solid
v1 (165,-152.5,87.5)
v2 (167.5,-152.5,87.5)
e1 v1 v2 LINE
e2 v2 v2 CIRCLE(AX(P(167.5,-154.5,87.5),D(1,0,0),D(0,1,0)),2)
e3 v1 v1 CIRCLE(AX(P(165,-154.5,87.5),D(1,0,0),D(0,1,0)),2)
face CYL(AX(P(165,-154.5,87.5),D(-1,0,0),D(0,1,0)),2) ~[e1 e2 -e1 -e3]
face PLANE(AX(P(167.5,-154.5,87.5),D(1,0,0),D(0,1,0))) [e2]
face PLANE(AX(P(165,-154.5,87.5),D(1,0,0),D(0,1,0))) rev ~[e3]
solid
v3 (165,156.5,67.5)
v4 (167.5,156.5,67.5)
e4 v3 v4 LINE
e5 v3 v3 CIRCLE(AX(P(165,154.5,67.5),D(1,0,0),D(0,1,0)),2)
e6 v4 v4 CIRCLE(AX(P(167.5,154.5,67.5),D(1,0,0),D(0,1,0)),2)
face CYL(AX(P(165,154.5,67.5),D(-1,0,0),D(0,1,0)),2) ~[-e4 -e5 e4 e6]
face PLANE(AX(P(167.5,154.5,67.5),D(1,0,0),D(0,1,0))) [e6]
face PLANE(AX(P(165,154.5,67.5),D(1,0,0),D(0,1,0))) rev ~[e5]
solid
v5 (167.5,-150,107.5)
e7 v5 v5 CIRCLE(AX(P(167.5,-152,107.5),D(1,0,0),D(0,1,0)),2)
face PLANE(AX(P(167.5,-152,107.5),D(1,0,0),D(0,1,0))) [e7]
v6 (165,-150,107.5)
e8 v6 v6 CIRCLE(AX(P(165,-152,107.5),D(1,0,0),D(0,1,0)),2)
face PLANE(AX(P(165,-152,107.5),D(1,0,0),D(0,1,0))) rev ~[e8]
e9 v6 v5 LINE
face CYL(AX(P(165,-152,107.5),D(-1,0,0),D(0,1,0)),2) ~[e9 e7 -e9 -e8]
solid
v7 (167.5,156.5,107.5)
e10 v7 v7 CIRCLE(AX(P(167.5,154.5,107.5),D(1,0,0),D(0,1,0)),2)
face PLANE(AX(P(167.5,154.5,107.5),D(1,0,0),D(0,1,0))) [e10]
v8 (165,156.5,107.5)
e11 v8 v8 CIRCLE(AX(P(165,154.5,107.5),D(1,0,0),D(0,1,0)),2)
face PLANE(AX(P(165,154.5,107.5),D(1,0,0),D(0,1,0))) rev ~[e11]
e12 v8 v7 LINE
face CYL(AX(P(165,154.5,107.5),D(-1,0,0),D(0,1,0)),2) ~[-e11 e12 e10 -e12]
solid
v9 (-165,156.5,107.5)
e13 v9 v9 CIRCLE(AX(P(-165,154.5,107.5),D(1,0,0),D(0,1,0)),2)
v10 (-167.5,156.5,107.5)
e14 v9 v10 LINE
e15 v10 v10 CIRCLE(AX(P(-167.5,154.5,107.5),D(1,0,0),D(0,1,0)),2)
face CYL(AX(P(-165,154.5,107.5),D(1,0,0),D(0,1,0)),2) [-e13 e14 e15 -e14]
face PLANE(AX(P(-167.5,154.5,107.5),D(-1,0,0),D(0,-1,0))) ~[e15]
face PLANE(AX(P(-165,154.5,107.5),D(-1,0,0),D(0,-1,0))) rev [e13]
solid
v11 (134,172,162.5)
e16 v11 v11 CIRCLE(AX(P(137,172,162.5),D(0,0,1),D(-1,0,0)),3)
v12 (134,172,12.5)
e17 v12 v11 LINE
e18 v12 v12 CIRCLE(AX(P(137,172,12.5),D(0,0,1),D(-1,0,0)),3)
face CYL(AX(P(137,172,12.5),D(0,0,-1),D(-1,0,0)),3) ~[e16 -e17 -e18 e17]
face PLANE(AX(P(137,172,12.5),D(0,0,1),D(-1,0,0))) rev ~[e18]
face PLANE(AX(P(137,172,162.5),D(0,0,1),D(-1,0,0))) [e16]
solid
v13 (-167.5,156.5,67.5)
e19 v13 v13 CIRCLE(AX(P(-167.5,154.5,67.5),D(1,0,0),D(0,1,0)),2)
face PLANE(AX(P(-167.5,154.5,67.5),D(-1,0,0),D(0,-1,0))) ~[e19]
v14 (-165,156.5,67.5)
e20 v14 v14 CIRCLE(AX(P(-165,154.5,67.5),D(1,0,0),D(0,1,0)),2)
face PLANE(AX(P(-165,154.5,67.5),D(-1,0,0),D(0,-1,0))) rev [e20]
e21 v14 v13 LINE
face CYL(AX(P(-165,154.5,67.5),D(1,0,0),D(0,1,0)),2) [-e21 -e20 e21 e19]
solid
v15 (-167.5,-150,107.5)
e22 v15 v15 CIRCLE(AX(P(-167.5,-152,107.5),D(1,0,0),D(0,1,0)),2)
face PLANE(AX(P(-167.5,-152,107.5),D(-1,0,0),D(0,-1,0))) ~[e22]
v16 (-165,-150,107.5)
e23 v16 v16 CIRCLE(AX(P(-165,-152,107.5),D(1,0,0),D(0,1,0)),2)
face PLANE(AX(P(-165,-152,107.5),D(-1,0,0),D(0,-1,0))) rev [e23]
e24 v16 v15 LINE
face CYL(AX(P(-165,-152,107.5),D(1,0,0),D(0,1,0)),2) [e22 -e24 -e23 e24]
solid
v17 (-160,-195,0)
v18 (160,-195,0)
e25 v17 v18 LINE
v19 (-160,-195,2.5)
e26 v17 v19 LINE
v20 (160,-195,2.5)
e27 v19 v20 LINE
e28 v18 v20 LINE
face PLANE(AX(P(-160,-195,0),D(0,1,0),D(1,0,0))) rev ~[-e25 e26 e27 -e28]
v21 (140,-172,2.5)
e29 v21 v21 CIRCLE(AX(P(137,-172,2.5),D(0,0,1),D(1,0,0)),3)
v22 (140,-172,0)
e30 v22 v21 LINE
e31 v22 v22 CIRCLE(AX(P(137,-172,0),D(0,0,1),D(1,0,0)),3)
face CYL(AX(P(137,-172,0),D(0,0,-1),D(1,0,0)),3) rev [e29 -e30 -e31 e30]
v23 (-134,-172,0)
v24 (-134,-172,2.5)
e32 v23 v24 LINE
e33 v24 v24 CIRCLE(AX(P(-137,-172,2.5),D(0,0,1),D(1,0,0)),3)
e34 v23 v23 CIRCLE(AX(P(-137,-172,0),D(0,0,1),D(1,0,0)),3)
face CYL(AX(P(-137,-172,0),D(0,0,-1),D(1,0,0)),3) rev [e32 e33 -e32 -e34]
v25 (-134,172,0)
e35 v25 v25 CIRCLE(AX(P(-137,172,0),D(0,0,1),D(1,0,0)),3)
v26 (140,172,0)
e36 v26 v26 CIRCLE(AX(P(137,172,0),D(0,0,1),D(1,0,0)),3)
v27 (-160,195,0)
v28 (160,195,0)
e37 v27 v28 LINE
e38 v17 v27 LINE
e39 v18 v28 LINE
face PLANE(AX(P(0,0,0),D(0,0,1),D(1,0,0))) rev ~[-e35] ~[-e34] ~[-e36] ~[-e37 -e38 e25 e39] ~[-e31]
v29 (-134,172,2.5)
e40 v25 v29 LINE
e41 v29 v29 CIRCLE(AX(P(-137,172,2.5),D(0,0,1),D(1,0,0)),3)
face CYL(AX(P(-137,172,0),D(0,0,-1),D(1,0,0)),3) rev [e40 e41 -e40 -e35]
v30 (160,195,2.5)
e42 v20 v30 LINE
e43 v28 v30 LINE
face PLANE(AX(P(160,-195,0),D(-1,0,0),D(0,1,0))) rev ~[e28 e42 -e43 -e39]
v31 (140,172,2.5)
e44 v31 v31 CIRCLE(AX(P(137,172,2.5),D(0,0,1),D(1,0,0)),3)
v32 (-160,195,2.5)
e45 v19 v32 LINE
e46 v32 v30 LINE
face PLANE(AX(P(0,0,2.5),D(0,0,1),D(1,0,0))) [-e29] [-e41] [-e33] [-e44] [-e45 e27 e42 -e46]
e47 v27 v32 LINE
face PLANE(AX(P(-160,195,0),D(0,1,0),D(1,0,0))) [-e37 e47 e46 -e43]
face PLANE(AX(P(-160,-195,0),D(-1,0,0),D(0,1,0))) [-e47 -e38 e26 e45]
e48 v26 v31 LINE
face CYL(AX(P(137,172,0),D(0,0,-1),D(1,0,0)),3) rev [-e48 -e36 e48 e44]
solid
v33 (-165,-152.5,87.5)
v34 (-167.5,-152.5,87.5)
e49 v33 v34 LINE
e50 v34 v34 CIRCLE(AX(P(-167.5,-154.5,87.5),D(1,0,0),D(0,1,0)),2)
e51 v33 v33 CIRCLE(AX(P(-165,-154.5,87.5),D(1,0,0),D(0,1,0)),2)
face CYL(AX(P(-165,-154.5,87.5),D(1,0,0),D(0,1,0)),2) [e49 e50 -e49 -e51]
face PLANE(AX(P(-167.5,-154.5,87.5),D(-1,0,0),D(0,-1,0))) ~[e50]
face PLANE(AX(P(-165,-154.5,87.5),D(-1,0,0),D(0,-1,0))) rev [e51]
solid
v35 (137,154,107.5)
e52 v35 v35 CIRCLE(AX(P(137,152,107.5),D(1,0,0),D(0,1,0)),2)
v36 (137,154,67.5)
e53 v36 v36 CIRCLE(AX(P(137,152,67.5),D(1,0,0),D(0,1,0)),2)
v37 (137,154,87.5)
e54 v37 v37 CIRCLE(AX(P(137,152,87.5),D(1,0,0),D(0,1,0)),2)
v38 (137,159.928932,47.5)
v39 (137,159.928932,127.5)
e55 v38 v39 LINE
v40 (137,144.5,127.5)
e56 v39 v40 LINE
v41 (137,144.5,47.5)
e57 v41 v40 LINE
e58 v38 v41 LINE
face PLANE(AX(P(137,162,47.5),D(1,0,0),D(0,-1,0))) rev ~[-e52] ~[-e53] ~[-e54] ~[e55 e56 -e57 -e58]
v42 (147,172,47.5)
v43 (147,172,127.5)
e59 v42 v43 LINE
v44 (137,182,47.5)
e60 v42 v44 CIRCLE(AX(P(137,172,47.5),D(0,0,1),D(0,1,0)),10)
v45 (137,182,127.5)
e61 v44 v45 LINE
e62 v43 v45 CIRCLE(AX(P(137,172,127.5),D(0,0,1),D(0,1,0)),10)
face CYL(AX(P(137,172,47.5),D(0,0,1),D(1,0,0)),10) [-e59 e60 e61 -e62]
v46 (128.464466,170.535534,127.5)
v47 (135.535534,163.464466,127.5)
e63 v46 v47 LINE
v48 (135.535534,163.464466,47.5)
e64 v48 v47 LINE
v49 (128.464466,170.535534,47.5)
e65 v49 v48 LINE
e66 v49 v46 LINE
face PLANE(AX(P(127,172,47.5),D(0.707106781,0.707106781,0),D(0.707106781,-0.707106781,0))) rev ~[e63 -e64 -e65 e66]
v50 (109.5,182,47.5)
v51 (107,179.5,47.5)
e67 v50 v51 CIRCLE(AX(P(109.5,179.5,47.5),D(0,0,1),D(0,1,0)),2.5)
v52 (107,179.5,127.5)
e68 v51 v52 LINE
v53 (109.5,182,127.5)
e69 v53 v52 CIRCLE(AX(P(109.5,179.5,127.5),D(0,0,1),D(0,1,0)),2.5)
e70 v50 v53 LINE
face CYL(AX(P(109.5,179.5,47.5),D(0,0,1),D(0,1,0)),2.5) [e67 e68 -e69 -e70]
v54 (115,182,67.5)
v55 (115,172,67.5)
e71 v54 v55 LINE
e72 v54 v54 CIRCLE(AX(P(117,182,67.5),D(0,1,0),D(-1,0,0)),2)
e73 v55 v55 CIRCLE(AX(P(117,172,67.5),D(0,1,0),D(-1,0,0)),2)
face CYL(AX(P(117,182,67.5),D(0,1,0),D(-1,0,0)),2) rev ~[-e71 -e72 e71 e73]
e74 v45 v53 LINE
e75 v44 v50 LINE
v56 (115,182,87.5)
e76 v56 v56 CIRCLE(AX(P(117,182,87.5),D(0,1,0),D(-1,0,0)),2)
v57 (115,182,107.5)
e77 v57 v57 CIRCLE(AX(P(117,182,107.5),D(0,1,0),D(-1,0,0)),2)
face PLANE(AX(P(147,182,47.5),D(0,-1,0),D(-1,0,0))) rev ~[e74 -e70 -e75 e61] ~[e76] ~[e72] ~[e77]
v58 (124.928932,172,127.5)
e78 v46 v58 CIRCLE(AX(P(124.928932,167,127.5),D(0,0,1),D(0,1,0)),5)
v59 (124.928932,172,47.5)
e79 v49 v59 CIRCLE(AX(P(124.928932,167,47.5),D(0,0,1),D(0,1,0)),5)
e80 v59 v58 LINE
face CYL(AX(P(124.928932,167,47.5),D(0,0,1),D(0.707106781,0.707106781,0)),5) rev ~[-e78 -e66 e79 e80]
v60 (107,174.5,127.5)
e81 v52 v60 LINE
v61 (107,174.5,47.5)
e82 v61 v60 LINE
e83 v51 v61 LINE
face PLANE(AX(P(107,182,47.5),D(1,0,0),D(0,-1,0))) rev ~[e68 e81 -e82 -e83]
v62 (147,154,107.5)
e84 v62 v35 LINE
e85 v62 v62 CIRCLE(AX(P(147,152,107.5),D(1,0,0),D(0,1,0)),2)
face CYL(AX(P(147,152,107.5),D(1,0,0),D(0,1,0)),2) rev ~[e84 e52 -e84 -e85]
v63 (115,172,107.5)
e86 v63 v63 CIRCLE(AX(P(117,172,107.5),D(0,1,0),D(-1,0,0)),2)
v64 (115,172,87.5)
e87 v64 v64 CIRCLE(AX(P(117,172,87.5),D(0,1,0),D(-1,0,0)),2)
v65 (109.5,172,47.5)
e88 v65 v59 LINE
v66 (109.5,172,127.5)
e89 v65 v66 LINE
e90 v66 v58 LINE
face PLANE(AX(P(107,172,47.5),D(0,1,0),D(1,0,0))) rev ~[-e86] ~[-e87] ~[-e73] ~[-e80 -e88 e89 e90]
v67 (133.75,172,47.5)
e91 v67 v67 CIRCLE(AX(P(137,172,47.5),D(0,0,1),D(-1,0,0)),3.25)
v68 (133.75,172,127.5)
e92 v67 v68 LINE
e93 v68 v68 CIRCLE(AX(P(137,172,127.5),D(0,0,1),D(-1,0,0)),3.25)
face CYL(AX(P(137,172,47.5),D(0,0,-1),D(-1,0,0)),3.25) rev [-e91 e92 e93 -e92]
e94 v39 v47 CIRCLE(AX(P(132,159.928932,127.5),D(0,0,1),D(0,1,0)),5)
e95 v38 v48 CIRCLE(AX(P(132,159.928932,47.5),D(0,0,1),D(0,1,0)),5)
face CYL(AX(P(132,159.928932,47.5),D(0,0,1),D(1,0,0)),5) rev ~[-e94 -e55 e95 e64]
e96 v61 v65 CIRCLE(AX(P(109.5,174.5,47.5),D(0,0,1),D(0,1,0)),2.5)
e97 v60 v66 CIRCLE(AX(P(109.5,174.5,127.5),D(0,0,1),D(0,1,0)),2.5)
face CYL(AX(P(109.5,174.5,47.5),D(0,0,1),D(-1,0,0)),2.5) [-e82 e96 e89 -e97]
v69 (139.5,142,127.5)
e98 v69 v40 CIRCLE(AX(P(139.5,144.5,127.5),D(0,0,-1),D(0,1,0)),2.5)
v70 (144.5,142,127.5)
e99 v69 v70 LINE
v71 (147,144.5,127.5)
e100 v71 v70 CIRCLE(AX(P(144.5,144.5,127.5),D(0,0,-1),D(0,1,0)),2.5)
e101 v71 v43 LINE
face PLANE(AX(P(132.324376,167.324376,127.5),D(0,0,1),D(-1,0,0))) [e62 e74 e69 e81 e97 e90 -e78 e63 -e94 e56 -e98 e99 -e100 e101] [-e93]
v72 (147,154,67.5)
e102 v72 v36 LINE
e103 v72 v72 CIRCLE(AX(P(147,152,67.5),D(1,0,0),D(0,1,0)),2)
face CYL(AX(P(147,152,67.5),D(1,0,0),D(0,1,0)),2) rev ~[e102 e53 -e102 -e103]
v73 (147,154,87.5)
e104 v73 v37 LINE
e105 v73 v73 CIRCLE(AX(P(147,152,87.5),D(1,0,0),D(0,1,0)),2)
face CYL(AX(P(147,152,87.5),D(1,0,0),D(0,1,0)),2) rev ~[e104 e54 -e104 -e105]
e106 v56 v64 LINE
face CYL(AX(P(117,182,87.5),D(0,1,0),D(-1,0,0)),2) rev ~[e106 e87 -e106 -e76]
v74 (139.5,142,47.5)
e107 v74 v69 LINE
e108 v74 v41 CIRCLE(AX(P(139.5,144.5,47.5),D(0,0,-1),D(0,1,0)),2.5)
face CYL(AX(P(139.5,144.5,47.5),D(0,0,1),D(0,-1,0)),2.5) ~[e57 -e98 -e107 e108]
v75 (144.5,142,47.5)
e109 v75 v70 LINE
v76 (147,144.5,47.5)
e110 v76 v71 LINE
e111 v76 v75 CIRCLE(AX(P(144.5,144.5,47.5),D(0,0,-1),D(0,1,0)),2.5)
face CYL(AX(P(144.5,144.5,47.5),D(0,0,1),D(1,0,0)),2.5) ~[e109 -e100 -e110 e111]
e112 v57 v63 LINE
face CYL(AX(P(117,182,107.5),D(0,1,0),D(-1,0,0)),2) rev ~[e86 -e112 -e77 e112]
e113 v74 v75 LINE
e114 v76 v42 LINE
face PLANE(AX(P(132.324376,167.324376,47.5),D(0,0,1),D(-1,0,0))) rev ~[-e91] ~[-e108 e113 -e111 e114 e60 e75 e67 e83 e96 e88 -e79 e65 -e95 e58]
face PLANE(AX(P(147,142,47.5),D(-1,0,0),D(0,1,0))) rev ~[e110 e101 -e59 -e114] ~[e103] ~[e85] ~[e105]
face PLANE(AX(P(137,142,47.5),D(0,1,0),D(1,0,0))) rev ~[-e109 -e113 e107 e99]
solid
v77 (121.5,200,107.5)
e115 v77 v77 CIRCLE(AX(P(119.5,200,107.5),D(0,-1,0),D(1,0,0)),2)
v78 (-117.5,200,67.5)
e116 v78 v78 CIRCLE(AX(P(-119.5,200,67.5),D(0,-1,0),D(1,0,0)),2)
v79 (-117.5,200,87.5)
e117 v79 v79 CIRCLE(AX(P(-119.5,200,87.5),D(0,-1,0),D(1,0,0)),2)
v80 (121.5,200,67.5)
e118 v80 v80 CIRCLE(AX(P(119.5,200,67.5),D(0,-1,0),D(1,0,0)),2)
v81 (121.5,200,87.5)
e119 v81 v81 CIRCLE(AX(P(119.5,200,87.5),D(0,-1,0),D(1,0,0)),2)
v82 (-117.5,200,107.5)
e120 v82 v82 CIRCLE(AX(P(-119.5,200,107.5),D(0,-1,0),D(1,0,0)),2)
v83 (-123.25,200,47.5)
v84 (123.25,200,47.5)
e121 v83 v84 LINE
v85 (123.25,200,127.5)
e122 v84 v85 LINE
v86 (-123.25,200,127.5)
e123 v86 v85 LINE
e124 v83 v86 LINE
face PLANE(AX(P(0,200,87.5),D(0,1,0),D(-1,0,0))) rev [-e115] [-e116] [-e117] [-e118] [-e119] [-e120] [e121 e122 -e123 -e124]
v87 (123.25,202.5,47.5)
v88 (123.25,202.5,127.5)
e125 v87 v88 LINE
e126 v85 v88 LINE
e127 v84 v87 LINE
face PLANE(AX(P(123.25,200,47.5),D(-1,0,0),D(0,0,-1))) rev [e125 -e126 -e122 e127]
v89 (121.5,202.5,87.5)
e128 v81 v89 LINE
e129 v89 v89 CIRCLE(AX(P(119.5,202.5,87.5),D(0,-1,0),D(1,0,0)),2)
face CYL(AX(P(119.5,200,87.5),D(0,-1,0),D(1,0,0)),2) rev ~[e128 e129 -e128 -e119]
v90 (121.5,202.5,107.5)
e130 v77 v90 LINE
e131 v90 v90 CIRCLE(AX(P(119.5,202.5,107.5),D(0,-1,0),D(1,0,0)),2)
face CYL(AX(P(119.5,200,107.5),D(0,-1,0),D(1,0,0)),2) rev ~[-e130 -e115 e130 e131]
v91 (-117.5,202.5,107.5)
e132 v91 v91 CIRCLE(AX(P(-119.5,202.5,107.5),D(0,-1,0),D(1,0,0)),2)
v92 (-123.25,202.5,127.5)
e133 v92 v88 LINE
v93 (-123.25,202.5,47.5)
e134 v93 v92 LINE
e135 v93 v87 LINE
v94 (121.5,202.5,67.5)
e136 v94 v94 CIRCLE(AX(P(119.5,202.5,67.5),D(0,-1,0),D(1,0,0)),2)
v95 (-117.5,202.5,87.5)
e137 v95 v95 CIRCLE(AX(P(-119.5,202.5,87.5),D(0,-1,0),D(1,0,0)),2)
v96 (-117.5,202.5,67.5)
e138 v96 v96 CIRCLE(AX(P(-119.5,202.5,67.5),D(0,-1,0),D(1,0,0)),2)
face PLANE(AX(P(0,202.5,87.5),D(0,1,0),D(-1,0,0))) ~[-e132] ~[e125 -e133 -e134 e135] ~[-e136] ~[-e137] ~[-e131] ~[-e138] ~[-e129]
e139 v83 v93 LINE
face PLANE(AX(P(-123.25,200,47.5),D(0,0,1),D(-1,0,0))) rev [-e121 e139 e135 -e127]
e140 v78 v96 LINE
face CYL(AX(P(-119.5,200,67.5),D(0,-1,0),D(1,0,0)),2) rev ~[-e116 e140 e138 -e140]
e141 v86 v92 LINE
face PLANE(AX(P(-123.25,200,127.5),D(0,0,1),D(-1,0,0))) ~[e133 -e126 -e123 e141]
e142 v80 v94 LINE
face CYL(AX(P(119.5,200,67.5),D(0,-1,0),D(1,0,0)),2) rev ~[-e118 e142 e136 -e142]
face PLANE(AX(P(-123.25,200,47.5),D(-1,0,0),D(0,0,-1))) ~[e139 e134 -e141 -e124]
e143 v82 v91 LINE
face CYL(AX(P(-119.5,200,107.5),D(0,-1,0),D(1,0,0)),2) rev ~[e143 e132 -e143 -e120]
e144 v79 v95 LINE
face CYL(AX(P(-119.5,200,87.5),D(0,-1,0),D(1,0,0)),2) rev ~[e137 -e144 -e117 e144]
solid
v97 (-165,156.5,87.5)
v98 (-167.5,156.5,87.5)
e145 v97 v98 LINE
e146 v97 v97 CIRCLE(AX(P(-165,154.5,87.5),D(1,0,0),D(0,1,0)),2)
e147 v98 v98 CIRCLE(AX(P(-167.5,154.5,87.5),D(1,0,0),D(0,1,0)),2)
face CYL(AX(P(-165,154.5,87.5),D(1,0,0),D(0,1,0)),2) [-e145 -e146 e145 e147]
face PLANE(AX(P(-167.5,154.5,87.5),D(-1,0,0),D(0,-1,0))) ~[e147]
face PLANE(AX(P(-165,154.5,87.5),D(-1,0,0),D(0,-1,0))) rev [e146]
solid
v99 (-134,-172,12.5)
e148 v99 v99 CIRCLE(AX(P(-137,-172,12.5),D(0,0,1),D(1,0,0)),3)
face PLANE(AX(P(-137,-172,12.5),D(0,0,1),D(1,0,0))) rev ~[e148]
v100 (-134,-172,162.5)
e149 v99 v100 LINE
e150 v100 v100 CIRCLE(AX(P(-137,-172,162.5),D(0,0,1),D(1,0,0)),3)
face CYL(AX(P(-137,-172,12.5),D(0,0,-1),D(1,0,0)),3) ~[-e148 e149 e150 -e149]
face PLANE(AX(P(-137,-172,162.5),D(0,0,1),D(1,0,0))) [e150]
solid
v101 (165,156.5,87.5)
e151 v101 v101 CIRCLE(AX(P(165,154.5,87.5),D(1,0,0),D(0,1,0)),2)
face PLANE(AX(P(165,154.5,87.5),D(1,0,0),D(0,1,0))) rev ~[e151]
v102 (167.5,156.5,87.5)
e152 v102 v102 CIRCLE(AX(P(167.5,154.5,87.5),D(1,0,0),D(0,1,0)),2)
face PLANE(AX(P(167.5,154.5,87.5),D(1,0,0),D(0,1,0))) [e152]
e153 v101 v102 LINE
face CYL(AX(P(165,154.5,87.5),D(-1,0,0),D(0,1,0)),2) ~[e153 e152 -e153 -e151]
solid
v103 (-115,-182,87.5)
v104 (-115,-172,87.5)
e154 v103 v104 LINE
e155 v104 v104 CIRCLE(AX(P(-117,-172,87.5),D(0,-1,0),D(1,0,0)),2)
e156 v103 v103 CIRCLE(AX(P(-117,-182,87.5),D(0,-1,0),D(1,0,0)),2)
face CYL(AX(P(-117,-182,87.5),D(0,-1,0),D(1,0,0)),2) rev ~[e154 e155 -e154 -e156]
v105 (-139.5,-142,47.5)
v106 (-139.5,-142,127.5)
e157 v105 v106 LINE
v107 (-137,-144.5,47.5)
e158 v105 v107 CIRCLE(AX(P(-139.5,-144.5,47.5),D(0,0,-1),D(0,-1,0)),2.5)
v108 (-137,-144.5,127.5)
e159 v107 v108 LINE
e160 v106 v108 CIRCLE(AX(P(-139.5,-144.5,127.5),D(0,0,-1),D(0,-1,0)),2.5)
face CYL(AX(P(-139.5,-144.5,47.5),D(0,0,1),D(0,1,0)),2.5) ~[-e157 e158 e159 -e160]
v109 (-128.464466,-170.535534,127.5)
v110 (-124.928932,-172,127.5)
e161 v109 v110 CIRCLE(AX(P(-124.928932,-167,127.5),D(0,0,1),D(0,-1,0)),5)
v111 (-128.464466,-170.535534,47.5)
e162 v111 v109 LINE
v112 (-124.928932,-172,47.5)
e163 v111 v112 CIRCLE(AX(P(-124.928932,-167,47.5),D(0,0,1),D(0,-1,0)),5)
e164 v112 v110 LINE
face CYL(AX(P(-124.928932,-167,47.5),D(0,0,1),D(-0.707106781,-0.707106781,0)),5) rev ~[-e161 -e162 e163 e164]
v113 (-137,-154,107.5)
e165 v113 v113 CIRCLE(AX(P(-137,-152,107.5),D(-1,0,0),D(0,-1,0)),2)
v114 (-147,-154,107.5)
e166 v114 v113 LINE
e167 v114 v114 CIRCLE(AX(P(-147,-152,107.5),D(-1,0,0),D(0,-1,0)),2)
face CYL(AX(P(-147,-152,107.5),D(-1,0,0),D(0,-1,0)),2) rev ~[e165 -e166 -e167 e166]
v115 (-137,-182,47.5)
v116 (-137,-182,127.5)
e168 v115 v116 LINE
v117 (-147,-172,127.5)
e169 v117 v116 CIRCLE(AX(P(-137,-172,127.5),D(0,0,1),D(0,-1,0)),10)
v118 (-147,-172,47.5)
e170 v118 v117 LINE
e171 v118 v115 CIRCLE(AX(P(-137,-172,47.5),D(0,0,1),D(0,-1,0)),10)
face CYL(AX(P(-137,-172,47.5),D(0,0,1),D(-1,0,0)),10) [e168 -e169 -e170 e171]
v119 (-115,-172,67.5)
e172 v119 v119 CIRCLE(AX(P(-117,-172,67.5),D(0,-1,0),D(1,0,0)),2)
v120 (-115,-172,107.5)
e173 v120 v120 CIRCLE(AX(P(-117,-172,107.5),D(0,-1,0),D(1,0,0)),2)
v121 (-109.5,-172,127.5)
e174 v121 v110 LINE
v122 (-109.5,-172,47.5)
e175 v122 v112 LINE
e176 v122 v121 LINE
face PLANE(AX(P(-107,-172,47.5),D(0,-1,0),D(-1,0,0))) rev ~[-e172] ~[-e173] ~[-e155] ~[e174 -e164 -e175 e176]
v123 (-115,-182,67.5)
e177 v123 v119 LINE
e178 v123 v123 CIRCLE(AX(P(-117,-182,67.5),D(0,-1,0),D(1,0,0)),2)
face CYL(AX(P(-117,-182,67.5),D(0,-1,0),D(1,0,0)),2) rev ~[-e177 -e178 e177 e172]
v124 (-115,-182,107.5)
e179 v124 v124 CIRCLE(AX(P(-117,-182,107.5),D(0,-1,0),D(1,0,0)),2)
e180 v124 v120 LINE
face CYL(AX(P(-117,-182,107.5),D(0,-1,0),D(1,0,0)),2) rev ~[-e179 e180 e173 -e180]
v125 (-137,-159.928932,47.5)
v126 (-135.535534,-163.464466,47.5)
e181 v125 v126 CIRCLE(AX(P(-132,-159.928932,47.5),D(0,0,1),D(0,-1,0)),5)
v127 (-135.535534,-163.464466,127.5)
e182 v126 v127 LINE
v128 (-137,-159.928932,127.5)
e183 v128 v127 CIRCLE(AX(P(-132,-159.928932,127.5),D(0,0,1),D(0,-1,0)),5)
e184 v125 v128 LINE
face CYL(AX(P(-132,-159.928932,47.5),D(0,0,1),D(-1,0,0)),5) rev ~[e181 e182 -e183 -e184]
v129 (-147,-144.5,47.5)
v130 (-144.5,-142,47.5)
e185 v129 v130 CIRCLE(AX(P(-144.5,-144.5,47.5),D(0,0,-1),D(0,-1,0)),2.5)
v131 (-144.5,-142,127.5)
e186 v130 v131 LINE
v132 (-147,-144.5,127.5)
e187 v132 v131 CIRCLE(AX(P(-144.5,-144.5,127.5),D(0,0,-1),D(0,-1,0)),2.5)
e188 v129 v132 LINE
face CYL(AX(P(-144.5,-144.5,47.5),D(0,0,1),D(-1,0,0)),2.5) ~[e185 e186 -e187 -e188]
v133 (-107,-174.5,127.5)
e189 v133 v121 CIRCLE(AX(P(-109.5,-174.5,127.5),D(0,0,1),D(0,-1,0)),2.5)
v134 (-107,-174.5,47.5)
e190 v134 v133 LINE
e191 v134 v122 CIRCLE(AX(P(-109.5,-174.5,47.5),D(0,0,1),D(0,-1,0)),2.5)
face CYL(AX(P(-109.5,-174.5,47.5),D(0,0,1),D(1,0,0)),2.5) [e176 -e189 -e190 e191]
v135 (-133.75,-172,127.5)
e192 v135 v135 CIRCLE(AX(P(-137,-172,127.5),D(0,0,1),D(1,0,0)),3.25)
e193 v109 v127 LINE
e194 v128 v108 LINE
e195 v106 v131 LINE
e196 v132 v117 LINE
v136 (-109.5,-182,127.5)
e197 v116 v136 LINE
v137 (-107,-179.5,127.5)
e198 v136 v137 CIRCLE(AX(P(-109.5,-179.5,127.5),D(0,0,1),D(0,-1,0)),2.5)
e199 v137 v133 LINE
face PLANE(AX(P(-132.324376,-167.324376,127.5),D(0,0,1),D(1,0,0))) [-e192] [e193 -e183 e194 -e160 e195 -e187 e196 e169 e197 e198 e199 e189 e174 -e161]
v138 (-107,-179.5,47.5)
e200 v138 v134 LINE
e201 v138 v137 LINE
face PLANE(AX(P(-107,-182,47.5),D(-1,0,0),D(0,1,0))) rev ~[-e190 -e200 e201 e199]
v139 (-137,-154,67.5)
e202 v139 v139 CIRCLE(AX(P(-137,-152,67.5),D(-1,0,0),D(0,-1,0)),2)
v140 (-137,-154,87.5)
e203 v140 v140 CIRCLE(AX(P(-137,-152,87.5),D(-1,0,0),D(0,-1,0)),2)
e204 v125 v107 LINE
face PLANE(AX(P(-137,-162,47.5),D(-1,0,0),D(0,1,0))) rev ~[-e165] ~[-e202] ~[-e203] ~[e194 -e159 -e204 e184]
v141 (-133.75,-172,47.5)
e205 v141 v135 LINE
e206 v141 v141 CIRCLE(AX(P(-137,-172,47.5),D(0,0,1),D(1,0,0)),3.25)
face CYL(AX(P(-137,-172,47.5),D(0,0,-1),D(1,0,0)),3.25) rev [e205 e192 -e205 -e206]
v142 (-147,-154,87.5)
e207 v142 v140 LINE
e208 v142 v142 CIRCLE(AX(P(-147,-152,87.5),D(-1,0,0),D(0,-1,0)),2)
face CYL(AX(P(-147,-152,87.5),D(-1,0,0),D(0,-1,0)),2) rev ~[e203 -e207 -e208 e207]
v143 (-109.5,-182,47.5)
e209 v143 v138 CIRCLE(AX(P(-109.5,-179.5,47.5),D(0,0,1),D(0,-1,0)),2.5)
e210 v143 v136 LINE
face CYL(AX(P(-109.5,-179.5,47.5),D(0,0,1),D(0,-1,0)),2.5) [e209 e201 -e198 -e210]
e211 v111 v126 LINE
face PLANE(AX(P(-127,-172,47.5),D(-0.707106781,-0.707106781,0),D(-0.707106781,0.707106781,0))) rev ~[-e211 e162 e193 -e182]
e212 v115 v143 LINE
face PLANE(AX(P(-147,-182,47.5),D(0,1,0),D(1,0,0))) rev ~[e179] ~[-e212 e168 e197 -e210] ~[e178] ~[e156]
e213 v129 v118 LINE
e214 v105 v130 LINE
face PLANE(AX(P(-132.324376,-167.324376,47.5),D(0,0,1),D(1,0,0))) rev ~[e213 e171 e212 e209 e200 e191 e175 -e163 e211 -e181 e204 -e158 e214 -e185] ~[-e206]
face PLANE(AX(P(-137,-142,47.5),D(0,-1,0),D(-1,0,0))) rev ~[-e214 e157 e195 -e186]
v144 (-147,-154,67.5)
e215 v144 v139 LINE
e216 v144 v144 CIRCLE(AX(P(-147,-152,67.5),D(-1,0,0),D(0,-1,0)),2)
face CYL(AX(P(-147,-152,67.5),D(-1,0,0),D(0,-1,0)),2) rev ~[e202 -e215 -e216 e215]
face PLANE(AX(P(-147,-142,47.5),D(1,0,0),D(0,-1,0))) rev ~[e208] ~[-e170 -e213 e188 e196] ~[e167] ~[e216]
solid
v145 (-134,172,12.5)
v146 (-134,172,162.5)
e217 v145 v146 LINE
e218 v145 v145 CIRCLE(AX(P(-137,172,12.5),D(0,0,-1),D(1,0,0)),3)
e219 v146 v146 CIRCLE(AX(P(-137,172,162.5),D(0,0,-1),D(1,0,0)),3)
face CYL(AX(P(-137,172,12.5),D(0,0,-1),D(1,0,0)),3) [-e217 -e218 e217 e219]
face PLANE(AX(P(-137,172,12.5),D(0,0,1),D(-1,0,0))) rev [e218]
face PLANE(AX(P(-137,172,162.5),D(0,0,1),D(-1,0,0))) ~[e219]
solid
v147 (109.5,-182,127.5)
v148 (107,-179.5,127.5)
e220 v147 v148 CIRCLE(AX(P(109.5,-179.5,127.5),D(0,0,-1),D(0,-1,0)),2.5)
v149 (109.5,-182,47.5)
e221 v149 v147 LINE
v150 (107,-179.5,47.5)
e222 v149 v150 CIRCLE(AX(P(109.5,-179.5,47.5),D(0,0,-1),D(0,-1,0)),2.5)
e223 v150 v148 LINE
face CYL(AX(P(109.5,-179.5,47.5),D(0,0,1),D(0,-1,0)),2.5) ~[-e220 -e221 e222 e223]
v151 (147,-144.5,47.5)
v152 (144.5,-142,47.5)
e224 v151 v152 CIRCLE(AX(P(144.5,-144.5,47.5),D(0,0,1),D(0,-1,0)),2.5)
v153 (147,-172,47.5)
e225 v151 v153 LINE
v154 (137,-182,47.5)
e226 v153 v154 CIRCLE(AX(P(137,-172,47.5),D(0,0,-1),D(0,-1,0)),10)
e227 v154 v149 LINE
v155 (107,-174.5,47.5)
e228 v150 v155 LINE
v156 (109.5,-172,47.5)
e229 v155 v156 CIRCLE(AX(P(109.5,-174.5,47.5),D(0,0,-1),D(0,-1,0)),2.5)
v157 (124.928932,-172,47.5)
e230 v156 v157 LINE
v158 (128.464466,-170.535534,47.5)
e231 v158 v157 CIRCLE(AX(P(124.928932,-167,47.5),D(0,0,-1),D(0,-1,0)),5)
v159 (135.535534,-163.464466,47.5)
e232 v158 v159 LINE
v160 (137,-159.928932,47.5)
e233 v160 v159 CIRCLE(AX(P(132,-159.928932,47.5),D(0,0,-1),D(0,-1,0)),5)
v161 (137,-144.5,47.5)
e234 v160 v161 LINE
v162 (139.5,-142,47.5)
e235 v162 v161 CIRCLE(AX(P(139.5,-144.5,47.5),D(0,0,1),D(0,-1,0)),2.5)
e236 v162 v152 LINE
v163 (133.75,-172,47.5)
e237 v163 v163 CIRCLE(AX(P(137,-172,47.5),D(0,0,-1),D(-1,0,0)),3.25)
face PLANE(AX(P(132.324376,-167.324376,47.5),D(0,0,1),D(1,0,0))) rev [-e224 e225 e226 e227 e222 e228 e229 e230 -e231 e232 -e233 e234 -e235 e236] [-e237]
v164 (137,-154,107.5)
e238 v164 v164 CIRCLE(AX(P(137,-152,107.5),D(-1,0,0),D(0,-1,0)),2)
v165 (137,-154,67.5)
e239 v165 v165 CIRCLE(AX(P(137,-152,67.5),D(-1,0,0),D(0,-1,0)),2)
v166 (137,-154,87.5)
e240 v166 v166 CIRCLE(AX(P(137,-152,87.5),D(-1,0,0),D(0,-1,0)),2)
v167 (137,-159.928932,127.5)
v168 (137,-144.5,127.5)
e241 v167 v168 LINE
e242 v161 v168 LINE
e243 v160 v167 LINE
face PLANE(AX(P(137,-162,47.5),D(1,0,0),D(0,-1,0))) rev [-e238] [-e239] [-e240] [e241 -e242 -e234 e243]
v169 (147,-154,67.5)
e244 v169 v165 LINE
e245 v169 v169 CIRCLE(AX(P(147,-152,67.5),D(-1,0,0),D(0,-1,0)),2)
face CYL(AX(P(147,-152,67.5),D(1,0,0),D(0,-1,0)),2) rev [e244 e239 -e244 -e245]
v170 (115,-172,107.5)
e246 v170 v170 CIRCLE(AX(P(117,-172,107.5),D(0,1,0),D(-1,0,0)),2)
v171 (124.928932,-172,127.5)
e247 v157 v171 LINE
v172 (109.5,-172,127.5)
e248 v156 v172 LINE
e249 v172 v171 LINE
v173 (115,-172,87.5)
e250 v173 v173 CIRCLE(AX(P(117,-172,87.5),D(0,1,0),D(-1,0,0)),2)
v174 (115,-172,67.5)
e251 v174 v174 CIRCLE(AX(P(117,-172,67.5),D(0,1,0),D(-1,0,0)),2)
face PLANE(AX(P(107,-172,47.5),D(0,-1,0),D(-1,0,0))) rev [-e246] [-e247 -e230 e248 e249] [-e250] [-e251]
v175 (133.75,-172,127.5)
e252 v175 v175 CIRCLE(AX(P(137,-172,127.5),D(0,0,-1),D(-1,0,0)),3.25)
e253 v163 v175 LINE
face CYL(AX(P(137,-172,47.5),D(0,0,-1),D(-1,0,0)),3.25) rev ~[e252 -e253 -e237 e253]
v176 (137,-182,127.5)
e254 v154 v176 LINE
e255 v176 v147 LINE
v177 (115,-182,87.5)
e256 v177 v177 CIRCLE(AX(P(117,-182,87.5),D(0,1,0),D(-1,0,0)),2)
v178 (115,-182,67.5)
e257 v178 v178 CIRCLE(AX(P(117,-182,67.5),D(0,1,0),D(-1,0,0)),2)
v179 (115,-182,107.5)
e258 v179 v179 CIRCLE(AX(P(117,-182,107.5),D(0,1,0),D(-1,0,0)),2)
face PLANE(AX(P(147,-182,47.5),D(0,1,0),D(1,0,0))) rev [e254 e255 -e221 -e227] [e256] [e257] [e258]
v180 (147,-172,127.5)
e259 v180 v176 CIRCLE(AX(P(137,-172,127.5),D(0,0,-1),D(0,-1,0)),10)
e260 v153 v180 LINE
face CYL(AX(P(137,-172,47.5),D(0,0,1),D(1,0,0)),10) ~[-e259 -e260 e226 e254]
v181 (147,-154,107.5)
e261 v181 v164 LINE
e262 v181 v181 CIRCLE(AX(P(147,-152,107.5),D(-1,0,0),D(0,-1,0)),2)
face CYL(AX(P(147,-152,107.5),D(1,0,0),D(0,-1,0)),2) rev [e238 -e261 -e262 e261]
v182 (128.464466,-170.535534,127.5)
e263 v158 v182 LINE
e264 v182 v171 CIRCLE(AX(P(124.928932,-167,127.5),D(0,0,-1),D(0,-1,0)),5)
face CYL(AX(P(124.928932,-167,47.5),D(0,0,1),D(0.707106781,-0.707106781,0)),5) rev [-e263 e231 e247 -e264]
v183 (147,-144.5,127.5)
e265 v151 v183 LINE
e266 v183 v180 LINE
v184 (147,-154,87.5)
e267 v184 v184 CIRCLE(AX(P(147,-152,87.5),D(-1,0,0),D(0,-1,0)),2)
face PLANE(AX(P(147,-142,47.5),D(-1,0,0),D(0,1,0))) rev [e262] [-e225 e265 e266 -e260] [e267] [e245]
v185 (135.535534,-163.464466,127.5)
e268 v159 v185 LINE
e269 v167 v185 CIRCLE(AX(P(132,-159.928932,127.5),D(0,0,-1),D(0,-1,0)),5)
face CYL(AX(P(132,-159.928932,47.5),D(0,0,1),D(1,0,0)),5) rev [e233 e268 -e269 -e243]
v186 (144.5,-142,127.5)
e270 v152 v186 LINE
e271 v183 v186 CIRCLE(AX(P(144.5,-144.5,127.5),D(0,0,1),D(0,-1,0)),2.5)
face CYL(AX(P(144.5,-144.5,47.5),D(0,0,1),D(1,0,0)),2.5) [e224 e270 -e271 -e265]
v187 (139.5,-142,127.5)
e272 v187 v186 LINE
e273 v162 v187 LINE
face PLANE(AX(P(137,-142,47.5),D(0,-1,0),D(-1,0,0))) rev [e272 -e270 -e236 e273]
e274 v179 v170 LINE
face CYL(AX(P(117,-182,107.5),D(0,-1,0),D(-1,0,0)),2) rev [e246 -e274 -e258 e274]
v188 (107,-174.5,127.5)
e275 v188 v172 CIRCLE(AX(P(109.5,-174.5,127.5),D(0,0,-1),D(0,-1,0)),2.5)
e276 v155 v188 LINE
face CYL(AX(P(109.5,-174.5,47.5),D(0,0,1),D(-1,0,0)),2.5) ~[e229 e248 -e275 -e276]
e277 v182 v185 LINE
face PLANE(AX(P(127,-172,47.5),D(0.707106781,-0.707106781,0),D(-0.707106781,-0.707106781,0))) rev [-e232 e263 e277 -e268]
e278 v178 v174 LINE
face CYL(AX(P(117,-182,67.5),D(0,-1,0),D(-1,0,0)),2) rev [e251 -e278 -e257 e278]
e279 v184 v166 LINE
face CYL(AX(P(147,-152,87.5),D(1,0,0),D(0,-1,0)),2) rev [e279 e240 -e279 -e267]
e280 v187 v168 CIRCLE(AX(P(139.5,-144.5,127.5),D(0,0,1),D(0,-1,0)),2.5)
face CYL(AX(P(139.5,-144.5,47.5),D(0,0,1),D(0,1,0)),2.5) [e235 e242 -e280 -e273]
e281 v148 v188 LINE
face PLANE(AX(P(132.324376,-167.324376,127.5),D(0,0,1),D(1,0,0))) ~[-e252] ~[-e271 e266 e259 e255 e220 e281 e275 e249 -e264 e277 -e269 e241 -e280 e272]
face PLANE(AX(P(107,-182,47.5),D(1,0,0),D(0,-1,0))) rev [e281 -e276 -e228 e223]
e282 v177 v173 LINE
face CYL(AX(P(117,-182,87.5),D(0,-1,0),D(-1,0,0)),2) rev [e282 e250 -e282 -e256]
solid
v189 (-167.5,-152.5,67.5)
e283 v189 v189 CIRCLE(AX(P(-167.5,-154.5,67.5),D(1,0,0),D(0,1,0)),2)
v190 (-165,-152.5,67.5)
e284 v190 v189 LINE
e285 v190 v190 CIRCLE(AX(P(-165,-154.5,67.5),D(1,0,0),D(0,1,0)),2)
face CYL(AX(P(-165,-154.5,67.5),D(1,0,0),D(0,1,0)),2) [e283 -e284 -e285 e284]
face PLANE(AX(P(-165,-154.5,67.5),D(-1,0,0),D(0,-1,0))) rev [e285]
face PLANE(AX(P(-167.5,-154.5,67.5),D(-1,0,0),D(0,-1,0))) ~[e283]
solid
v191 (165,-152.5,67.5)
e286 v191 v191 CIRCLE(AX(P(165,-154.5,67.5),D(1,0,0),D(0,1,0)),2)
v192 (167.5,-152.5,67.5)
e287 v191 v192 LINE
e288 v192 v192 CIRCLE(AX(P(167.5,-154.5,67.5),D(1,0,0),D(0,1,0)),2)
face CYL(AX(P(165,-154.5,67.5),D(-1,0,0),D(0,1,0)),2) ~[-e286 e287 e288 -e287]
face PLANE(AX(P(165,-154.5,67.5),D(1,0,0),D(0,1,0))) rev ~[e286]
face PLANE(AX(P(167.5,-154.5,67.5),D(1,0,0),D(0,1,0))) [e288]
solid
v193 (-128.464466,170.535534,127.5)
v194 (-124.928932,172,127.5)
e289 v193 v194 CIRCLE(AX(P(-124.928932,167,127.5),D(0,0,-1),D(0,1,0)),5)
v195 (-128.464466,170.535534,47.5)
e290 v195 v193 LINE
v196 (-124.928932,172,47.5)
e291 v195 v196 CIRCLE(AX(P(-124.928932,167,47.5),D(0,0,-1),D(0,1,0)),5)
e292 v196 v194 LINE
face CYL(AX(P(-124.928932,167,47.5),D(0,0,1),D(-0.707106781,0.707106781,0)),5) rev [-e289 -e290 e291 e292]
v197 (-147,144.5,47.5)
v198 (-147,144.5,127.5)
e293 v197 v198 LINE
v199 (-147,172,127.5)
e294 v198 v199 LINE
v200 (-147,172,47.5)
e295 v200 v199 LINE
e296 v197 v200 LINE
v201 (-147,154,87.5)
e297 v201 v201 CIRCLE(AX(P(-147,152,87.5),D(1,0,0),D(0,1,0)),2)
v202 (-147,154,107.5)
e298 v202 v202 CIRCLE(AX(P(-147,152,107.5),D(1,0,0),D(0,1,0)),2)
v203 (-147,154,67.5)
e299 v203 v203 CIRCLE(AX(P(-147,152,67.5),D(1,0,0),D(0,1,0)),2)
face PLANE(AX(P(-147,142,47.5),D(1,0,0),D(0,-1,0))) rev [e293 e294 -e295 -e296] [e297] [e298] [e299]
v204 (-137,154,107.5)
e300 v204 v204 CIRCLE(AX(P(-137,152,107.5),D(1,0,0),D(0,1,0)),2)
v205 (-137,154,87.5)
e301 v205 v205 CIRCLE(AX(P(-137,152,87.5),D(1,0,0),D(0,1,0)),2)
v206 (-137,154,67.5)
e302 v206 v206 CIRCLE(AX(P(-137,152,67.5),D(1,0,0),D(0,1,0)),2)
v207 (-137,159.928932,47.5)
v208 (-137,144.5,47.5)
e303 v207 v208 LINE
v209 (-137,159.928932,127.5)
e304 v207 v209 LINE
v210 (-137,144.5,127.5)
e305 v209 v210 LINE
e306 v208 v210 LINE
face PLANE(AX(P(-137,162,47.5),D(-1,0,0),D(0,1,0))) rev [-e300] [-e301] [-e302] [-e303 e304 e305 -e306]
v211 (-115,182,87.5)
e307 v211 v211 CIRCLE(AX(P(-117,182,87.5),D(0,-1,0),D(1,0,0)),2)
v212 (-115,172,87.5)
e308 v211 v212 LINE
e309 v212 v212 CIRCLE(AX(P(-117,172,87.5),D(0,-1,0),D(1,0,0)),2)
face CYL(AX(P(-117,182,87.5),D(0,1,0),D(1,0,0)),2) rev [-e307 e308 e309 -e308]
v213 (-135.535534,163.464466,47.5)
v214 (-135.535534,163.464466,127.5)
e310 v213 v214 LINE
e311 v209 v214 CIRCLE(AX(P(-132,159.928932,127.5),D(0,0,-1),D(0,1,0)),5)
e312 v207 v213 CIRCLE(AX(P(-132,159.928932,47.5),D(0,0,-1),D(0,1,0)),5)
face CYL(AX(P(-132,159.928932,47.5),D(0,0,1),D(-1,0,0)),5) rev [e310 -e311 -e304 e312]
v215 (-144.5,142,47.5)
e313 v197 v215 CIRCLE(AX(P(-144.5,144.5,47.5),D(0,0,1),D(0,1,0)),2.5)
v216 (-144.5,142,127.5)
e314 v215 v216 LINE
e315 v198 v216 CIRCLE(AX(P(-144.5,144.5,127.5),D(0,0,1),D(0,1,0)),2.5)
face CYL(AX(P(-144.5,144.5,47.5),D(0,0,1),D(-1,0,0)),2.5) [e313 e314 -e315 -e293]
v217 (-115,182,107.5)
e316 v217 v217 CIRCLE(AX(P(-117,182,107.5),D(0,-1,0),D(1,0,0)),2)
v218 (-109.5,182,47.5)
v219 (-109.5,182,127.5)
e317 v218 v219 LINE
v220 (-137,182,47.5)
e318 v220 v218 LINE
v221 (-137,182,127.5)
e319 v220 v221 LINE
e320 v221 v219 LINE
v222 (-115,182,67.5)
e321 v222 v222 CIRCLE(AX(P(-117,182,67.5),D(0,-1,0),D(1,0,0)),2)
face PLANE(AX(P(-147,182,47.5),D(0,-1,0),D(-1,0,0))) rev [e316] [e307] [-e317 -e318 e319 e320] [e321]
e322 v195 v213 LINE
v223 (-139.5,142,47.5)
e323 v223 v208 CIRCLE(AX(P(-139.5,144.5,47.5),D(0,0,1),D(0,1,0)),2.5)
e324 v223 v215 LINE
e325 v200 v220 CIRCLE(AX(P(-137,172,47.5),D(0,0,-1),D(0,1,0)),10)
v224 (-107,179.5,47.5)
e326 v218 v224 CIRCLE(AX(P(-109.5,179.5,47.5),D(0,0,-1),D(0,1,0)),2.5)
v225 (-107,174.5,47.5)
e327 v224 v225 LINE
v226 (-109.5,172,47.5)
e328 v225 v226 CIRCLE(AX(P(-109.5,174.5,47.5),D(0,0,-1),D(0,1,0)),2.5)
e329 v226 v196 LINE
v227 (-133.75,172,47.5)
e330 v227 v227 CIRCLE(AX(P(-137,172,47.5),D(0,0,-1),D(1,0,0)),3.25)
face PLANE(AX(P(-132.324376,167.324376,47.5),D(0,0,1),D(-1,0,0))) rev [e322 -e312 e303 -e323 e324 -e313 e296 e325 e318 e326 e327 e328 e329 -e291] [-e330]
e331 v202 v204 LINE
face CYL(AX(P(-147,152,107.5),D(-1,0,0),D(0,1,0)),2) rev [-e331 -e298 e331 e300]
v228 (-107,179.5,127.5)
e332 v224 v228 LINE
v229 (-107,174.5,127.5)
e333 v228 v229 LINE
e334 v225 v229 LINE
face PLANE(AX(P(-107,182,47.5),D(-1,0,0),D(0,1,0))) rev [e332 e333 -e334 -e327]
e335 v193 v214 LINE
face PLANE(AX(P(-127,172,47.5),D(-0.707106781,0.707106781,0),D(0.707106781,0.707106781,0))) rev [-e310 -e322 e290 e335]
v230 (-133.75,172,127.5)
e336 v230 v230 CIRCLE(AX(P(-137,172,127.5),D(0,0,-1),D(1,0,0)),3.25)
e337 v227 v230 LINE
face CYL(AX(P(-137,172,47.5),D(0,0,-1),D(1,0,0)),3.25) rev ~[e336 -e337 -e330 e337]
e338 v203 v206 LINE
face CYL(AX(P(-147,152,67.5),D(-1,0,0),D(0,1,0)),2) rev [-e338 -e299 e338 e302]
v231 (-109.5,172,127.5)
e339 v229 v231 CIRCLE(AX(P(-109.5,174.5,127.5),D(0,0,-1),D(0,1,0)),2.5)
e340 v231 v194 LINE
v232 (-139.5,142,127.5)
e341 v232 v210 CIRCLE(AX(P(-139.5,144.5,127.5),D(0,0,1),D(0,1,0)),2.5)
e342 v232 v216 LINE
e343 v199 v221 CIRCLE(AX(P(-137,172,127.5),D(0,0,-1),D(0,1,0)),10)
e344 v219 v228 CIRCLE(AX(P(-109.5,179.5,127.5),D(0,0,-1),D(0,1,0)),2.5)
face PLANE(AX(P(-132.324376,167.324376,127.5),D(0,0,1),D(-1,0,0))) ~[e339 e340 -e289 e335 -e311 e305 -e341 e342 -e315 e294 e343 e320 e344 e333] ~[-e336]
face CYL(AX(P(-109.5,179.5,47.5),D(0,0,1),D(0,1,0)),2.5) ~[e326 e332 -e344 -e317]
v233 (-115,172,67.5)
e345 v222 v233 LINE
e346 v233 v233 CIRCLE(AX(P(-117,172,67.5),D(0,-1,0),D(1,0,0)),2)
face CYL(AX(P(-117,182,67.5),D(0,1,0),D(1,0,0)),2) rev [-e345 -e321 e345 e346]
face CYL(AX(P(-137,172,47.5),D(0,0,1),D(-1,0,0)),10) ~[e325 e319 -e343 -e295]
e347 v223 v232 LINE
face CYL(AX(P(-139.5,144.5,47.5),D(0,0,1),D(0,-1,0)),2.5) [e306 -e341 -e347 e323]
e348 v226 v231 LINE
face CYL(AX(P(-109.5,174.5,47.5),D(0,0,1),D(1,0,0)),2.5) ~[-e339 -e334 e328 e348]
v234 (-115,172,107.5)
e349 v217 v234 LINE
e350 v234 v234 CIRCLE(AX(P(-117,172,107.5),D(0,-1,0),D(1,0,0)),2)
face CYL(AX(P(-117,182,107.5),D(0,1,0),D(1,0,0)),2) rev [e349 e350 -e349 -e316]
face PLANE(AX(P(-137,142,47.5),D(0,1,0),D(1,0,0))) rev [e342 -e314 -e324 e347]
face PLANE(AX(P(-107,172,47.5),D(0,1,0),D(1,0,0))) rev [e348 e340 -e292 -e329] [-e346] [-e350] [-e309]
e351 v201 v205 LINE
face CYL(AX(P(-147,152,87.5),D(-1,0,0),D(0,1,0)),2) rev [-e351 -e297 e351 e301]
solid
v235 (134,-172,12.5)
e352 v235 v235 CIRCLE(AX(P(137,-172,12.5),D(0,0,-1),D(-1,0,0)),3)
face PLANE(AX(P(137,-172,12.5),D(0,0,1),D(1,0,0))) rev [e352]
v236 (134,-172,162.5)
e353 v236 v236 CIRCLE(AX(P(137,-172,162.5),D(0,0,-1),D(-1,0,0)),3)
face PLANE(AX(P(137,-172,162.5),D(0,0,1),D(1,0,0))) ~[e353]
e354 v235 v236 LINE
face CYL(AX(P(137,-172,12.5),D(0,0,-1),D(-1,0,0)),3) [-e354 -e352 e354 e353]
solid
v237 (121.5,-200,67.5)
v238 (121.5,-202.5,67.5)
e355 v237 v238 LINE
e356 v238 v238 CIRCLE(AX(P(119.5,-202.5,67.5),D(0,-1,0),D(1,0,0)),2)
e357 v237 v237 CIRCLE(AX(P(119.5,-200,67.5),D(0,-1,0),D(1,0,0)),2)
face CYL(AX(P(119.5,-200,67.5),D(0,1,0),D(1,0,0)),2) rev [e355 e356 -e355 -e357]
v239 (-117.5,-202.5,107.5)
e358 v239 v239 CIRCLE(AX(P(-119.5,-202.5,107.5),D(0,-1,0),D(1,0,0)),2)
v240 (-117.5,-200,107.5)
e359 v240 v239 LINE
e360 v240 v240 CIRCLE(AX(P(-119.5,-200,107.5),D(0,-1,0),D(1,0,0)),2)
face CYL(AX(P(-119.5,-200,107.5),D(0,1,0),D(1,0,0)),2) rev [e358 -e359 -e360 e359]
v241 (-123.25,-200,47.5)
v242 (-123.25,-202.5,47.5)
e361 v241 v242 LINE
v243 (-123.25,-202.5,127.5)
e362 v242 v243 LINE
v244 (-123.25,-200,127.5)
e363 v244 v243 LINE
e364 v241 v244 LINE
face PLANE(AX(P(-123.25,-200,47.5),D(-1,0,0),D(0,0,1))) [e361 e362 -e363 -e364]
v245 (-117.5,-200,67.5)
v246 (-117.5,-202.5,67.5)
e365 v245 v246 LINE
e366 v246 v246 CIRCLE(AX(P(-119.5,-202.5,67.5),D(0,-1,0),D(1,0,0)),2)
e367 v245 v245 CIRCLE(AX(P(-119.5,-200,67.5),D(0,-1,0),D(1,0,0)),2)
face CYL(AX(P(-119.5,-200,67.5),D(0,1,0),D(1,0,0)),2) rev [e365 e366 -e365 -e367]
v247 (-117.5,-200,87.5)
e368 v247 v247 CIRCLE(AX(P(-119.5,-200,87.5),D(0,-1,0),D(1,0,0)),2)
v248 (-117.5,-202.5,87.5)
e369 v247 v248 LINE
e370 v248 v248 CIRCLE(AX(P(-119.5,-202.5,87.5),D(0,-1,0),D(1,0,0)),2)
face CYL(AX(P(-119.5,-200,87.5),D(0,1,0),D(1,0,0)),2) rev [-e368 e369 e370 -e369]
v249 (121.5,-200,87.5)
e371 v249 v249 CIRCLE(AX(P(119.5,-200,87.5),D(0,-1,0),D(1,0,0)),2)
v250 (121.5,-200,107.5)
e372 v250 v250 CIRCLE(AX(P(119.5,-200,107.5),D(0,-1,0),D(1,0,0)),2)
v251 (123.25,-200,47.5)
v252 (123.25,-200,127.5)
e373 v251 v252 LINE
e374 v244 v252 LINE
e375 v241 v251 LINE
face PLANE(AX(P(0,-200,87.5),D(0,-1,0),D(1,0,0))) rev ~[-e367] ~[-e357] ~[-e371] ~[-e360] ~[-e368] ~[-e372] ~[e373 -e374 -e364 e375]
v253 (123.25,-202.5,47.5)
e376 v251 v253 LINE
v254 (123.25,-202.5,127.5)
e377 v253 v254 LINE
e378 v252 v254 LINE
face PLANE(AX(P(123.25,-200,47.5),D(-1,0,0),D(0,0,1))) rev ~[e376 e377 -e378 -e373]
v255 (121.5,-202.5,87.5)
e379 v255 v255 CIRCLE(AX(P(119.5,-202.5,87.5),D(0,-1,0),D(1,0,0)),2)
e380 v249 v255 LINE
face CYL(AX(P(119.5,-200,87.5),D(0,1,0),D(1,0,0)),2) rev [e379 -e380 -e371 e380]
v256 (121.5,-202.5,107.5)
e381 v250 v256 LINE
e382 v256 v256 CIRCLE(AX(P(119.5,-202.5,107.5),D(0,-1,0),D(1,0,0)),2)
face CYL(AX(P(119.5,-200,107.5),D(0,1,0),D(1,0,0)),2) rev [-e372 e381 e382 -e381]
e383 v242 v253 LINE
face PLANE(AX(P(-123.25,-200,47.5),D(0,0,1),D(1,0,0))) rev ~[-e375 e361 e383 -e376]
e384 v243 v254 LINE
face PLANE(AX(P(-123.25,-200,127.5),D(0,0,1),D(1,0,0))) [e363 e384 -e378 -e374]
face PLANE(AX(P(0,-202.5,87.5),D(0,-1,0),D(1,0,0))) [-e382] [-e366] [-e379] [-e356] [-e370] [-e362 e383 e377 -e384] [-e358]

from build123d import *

# Parameters (mm, degrees)
F0_W      = 320
F0_H      = 390
F0_R      = 3
F1_DEPTH  = 2.5
F3_R      = 3
F4_DEPTH  = 150
F8_R      = 3.25
F9_DEPTH  = 80
F10_R     = 2
F11_DEPTH = 377.001
F12_R     = 2
F13_DEPTH = 307.001
F14_R     = 10
F15_R     = 2.5
F16_R     = 5
F20_W     = 246.5
F20_H     = 80
F20_R     = 2
F21_DEPTH = 2.5
F24_R     = 2
F25_DEPTH = 2.5


with BuildPart() as f1:
    # F0 (on Top) → F1 (new body)
    with BuildSketch(Plane.XY):
        Rectangle(F0_W, F0_H)
        with Locations((-137, -172)):
            Circle(F0_R, mode=Mode.SUBTRACT)
        with Locations((137, -172)):
            Circle(F0_R, mode=Mode.SUBTRACT)
        with Locations((-137, 172)):
            Circle(F0_R, mode=Mode.SUBTRACT)
        with Locations((137, 172)):
            Circle(F0_R, mode=Mode.SUBTRACT)
    extrude(amount=F1_DEPTH)


with BuildPart() as f4:
    # F3 (on offset) → F4 (new body)
    with BuildSketch(Plane.XY.offset(12.5)):
        with Locations((-137, -172)):
            Circle(F3_R)
    extrude(amount=F4_DEPTH)


with BuildPart() as f5_1:
    # F5: instance of F4
    add(f4.part.mirror(Plane.YZ))


with BuildPart() as f6_1:
    # F6: instance of F4
    add(f4.part.mirror(Plane.XZ))


with BuildPart() as f6_2:
    # F6: instance of F5_1
    add(f5_1.part.mirror(Plane.XZ))


with BuildPart() as f9:
    # F8 (on offset) → F9 (new body)
    with BuildSketch(Plane.XY.offset(47.5)):
        Polygon((-137, -142), (-147, -142), (-147, -182), (-107, -182), (-107, -172), (-127, -172), (-137, -162), align=None)
        with Locations((-137, -172)):
            Circle(F8_R, mode=Mode.SUBTRACT)
    extrude(amount=F9_DEPTH)

    # F10 (on face) → F11 (cut, through all)
    with BuildSketch(Plane.XZ.offset(182)):
        with Locations((-117, 107.5)):
            Circle(F10_R)
        with Locations((-117, 87.5)):
            Circle(F10_R)
        with Locations((-117, 67.5)):
            Circle(F10_R)
    extrude(amount=-F11_DEPTH, mode=Mode.SUBTRACT)

    # F12 (on face) → F13 (cut, through all)
    with BuildSketch(Plane(origin=(-147, 0, 0), x_dir=(0, -1, 0), z_dir=(-1, 0, 0))):
        with Locations((152, 87.5)):
            Circle(F12_R)
        with Locations((152, 107.5)):
            Circle(F12_R)
        with Locations((152, 67.5)):
            Circle(F12_R)
    extrude(amount=-F13_DEPTH, mode=Mode.SUBTRACT)

    # F14
    f14_edges = [f9.edges().sort_by_distance(p)[0] for p in [
        (-147, -182, 87.5),
    ]]
    fillet(f14_edges, radius=F14_R)

    # F15
    f15_edges = [f9.edges().sort_by_distance(p)[0] for p in [
        (-107, -172, 87.5),
        (-137, -142, 87.5),
        (-147, -142, 87.5),
        (-107, -182, 87.5),
    ]]
    fillet(f15_edges, radius=F15_R)

    # F16
    f16_edges = [f9.edges().sort_by_distance(p)[0] for p in [
        (-137, -162, 87.5),
        (-127, -172, 87.5),
    ]]
    fillet(f16_edges, radius=F16_R)


with BuildPart() as f17_1:
    # F17: instance of F9
    add(f9.part.mirror(Plane.YZ))


with BuildPart() as f18_1:
    # F18: instance of F9
    add(f9.part.mirror(Plane.XZ))


with BuildPart() as f18_2:
    # F18: instance of F17_1
    add(f17_1.part.mirror(Plane.XZ))


with BuildPart() as f21:
    # F20 (on offset) → F21 (new body)
    with BuildSketch(Plane.XZ.offset(200)):
        with Locations((0, 87.5)):
            Rectangle(F20_W, F20_H)
        with Locations((-119.5, 67.5)):
            Circle(F20_R, mode=Mode.SUBTRACT)
        with Locations((119.5, 67.5)):
            Circle(F20_R, mode=Mode.SUBTRACT)
        with Locations((-119.5, 87.5)):
            Circle(F20_R, mode=Mode.SUBTRACT)
        with Locations((-119.5, 107.5)):
            Circle(F20_R, mode=Mode.SUBTRACT)
        with Locations((119.5, 87.5)):
            Circle(F20_R, mode=Mode.SUBTRACT)
        with Locations((119.5, 107.5)):
            Circle(F20_R, mode=Mode.SUBTRACT)
    extrude(amount=F21_DEPTH)


with BuildPart() as f22_1:
    # F22: instance of F21
    add(f21.part.mirror(Plane.XZ))


with BuildPart() as f25:
    # F24 (on offset) → F25 (new body)
    with BuildSketch(Plane.YZ.offset(165)):
        with Locations((-152, 107.5)):
            Circle(F24_R)
    extrude(amount=F25_DEPTH)


with BuildPart() as f25b:
    # F24 (on offset) → F25, piece 2 (new body)
    with BuildSketch(Plane.YZ.offset(165)):
        with Locations((-154.5, 87.5)):
            Circle(F24_R)
    extrude(amount=F25_DEPTH)


with BuildPart() as f25c:
    # F24 (on offset) → F25, piece 3 (new body)
    with BuildSketch(Plane.YZ.offset(165)):
        with Locations((-154.5, 67.5)):
            Circle(F24_R)
    extrude(amount=F25_DEPTH)


with BuildPart() as f25d:
    # F24 (on offset) → F25, piece 4 (new body)
    with BuildSketch(Plane.YZ.offset(165)):
        with Locations((154.5, 107.5)):
            Circle(F24_R)
    extrude(amount=F25_DEPTH)


with BuildPart() as f25e:
    # F24 (on offset) → F25, piece 5 (new body)
    with BuildSketch(Plane.YZ.offset(165)):
        with Locations((154.5, 87.5)):
            Circle(F24_R)
    extrude(amount=F25_DEPTH)


with BuildPart() as f25f:
    # F24 (on offset) → F25, piece 6 (new body)
    with BuildSketch(Plane.YZ.offset(165)):
        with Locations((154.5, 67.5)):
            Circle(F24_R)
    extrude(amount=F25_DEPTH)


with BuildPart() as f26_1:
    # F26: instance of F25
    add(f25.part.mirror(Plane.YZ))


with BuildPart() as f26_2:
    # F26: instance of F25b
    add(f25b.part.mirror(Plane.YZ))


with BuildPart() as f26_3:
    # F26: instance of F25c
    add(f25c.part.mirror(Plane.YZ))


with BuildPart() as f26_4:
    # F26: instance of F25d
    add(f25d.part.mirror(Plane.YZ))


with BuildPart() as f26_5:
    # F26: instance of F25e
    add(f25e.part.mirror(Plane.YZ))


with BuildPart() as f26_6:
    # F26: instance of F25f
    add(f25f.part.mirror(Plane.YZ))


solid = Compound([f1.part, f4.part, f5_1.part, f6_1.part, f6_2.part, f9.part, f17_1.part, f18_1.part, f18_2.part, f21.part, f22_1.part, f25.part, f25b.part, f25c.part, f25d.part, f25e.part, f25f.part, f26_1.part, f26_2.part, f26_3.part, f26_4.part, f26_5.part, f26_6.part])
